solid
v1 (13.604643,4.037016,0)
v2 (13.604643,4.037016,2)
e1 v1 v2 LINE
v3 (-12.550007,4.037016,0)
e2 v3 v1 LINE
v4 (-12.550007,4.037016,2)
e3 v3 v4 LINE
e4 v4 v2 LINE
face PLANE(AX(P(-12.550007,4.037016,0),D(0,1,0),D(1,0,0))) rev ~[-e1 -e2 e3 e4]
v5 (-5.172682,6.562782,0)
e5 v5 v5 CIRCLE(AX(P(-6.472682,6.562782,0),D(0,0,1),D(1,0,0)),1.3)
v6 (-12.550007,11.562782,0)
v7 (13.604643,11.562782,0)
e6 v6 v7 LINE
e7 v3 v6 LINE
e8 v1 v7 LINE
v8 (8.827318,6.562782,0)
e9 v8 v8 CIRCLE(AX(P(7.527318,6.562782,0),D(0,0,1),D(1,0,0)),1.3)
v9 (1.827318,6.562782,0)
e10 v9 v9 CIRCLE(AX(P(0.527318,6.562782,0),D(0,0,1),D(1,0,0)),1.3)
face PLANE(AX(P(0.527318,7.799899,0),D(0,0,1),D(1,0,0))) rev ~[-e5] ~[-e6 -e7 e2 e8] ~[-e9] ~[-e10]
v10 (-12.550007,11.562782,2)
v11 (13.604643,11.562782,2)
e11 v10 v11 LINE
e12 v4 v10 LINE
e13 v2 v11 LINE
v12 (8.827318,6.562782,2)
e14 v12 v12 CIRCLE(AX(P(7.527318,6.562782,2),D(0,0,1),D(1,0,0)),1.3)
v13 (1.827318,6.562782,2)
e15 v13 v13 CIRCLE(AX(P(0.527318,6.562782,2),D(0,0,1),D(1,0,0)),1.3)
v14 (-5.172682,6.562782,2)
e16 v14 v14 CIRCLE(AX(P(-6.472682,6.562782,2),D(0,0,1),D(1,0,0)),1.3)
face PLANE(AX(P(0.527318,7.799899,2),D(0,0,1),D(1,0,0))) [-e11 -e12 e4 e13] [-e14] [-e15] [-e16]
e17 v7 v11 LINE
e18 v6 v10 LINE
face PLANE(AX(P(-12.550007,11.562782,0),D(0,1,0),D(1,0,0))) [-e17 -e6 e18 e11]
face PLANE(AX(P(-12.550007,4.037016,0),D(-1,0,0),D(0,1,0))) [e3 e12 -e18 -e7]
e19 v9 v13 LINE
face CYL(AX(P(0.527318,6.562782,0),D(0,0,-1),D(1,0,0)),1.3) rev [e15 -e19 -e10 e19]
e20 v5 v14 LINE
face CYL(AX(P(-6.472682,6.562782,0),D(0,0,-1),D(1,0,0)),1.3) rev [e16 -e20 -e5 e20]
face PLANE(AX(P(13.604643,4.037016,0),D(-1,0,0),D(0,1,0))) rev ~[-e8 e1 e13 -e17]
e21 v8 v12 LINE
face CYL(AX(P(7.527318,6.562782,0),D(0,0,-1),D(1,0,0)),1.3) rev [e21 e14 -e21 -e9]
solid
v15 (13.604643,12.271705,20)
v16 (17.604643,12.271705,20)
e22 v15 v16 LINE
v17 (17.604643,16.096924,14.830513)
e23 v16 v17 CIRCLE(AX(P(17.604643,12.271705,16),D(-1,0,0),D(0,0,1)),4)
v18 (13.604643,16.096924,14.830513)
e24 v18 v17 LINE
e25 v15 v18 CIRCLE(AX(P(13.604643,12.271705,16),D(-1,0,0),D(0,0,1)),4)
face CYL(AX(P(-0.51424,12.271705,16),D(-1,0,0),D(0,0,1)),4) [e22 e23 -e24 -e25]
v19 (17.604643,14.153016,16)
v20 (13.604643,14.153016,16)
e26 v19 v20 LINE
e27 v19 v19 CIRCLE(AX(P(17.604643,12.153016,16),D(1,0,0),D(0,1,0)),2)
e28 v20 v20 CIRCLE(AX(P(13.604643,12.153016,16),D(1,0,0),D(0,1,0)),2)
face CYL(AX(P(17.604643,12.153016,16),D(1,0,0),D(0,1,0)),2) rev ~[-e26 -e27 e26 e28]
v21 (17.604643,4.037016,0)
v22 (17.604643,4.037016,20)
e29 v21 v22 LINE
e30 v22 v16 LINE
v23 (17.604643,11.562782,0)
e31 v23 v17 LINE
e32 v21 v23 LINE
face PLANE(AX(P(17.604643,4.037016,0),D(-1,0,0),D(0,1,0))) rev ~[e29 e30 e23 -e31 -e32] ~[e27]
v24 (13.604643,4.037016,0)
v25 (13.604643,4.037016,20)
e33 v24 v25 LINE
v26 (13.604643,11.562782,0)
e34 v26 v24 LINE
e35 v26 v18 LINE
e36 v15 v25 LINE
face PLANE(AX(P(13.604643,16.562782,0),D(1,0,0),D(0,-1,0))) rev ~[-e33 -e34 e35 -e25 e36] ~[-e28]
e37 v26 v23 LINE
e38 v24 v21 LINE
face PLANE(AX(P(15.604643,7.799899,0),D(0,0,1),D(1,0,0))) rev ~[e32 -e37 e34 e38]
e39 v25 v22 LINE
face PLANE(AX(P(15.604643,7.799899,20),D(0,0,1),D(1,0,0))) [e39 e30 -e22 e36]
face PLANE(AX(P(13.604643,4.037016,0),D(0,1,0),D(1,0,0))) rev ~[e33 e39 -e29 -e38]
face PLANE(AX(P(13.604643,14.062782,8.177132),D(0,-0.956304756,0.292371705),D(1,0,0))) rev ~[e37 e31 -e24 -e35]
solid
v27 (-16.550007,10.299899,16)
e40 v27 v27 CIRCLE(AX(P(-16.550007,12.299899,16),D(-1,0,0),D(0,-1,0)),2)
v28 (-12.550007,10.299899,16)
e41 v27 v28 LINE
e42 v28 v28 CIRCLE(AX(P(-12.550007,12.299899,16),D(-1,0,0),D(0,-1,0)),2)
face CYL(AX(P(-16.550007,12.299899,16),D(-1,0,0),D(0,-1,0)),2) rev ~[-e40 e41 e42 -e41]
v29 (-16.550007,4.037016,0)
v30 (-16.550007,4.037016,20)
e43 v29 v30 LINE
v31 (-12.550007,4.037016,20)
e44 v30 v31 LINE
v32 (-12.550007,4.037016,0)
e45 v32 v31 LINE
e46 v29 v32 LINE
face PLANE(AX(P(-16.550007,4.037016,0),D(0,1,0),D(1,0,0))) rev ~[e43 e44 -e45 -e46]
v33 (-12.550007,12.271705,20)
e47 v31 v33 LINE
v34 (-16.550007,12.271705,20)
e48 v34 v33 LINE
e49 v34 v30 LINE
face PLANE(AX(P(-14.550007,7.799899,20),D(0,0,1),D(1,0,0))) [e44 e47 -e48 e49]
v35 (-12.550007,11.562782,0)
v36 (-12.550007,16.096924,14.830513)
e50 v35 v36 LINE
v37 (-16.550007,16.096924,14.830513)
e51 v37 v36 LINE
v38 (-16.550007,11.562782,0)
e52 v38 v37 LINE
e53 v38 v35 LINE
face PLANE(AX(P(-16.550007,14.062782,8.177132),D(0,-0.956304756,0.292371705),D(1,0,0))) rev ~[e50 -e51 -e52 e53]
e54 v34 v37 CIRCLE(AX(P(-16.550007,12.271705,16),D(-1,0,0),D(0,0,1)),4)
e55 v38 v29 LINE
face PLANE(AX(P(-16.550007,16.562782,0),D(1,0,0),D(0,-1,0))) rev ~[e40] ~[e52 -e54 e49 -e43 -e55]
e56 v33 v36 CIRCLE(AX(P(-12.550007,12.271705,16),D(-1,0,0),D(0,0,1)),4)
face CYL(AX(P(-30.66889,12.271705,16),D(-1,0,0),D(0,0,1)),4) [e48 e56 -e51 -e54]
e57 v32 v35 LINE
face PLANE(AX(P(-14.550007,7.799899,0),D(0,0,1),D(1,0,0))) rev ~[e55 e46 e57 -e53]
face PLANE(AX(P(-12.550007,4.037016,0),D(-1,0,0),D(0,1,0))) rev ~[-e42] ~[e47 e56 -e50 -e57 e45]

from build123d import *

# Parameters (mm, degrees)
F0_W           = 4
F0_H           = 7.5257653005
F0_H_2         = 5
F1_DEPTH       = 20
F0_W_2         = 26.1546501577
F0_R           = 1.3
F2_DEPTH       = 2
F3_SIZE2       = 16.3542630924
F3_SIZE        = 5
F4_SIZE2       = 16.3542630924
F4_SIZE        = 5
F5_R           = 2
F6_DEPTH       = 5.8
F7_R           = 2
F8_DEPTH       = 7.32
F9_T1_DEPTH    = 24
F9_2_T1_DEPTH  = 24
F10_T1_DEPTH   = 32.2377661773
F10_2_T1_DEPTH = 32.2377661773


# Not quite as in the source:
# - a fillet or chamfer that OpenCascade refuses, or shapes differently, is made with other operations: its cross-section is extruded or revolved along the edge and cut away or added


with BuildPart() as f1:
    # F0 (on Top) → F1 (new body)
    with BuildSketch(Plane.XY):
        with Locations((-14.5500070333, 7.7998988752)):
            Rectangle(F0_W, F0_H)
        with Locations((-14.5500070333, 14.0627815254)):
            Rectangle(F0_W, F0_H_2)
    extrude(amount=F1_DEPTH)

    # F3
    f3_edges = [f1.edges().sort_by_distance(p)[0] for p in [
        (-14.550007, 16.562782, 0),
    ]]
    f3_side = f1.faces().sort_by_distance((-14.550007, 10.299899, 0))[0]
    chamfer(f3_edges, length=F3_SIZE, length2=F3_SIZE2, reference=f3_side)

    # F5 (on face) → F6 (cut)
    with BuildSketch(Plane(origin=(-16.5500070333, 0, 0), x_dir=(0, -1, 0), z_dir=(-1, 0, 0))):
        with Locations((-12.2998988752, 16)):
            Circle(F5_R)
    extrude(amount=-F6_DEPTH, mode=Mode.SUBTRACT)

    # F9#2: fillet of radius 4 on 1 edges, made by hand

    # F9_2_s2 → F9_2_t1 (cut)
    with BuildSketch(Plane.YZ.offset(-26.5500070333)):
        with BuildLine():
            ThreePointArc((16.5627815254, 16), (15.3912086502, 18.8284271247), (12.5627815254, 20))
            Line((12.5627815254, 20), (16.5627815254, 20))
            Line((16.5627815254, 20), (16.5627815254, 16))
        make_face()
    extrude(amount=F9_2_T1_DEPTH, mode=Mode.SUBTRACT)

    # F10#2: fillet of radius 4 on 1 edges, made by hand

    # F10_2_s2 → F10_2_t1 (cut)
    with BuildSketch(Plane.YZ.offset(-30.668890122)):
        with BuildLine():
            ThreePointArc((12.2717054028, 20), (15.4871328453, 18.379291147), (16.0969244267, 14.8305131811))
            Line((16.0969244267, 14.8305131811), (16.479446329, 14.7135644992))
            Line((16.479446329, 14.7135644992), (16.932966821, 16.196963188))
            Line((16.932966821, 16.196963188), (16.949211258, 16.3453030569))
            ThreePointArc((16.949211258, 16.3453030569), (12.5627815254, 20.4), (12.2717054028, 20.4))
            Line((12.2717054028, 20.4), (12.2717054028, 20))
        make_face()
    extrude(amount=F10_2_T1_DEPTH, mode=Mode.SUBTRACT)


with BuildPart() as f1b:
    # F0 (on Top) → F1, piece 2 (new body)
    with BuildSketch(Plane.XY):
        with Locations((15.6046431243, 7.7998988752)):
            Rectangle(F0_W, F0_H)
        with Locations((15.6046431243, 14.0627815254)):
            Rectangle(F0_W, F0_H_2)
    extrude(amount=F1_DEPTH)

    # F4
    f4_edges = [f1b.edges().sort_by_distance(p)[0] for p in [
        (15.604643, 16.562782, 0),
    ]]
    f4_side = f1b.faces().sort_by_distance((15.604643, 10.299899, 0))[0]
    chamfer(f4_edges, length=F4_SIZE, length2=F4_SIZE2, reference=f4_side)

    # F7 (on face) → F8 (cut)
    with BuildSketch(Plane.YZ.offset(17.6046431243)):
        with Locations((12.1530162249, 16)):
            Circle(F7_R)
    extrude(amount=-F8_DEPTH, mode=Mode.SUBTRACT)

    # F9: fillet of radius 4 on 1 edges, made by hand

    # F9_s2 → F9_t1 (cut)
    with BuildSketch(Plane.YZ.offset(3.6046431243)):
        with BuildLine():
            ThreePointArc((16.5627815254, 16), (15.3912086502, 18.8284271247), (12.5627815254, 20))
            Line((12.5627815254, 20), (16.5627815254, 20))
            Line((16.5627815254, 20), (16.5627815254, 16))
        make_face()
    extrude(amount=F9_T1_DEPTH, mode=Mode.SUBTRACT)

    # F10: fillet of radius 4 on 1 edges, made by hand

    # F10_s2 → F10_t1 (cut)
    with BuildSketch(Plane.YZ.offset(-0.5142399643)):
        with BuildLine():
            ThreePointArc((12.2717054028, 20), (15.4871328453, 18.379291147), (16.0969244267, 14.8305131811))
            Line((16.0969244267, 14.8305131811), (16.479446329, 14.7135644992))
            Line((16.479446329, 14.7135644992), (16.932966821, 16.196963188))
            Line((16.932966821, 16.196963188), (16.949211258, 16.3453030569))
            ThreePointArc((16.949211258, 16.3453030569), (12.5627815254, 20.4), (12.2717054028, 20.4))
            Line((12.2717054028, 20.4), (12.2717054028, 20))
        make_face()
    extrude(amount=F10_T1_DEPTH, mode=Mode.SUBTRACT)


with BuildPart() as f2:
    # F0 (on Top) → F2 (new body)
    with BuildSketch(Plane.XY):
        with Locations((0.5273180455, 7.7998988752)):
            Rectangle(F0_W_2, F0_H)
        with Locations((-6.4726819545, 6.5627815254)):
            Circle(F0_R, mode=Mode.SUBTRACT)
        with Locations((0.5273180455, 6.5627815254)):
            Circle(F0_R, mode=Mode.SUBTRACT)
        with Locations((7.5273180455, 6.5627815254)):
            Circle(F0_R, mode=Mode.SUBTRACT)
    extrude(amount=F2_DEPTH)


solid = Compound([f1.part, f1b.part, f2.part])
